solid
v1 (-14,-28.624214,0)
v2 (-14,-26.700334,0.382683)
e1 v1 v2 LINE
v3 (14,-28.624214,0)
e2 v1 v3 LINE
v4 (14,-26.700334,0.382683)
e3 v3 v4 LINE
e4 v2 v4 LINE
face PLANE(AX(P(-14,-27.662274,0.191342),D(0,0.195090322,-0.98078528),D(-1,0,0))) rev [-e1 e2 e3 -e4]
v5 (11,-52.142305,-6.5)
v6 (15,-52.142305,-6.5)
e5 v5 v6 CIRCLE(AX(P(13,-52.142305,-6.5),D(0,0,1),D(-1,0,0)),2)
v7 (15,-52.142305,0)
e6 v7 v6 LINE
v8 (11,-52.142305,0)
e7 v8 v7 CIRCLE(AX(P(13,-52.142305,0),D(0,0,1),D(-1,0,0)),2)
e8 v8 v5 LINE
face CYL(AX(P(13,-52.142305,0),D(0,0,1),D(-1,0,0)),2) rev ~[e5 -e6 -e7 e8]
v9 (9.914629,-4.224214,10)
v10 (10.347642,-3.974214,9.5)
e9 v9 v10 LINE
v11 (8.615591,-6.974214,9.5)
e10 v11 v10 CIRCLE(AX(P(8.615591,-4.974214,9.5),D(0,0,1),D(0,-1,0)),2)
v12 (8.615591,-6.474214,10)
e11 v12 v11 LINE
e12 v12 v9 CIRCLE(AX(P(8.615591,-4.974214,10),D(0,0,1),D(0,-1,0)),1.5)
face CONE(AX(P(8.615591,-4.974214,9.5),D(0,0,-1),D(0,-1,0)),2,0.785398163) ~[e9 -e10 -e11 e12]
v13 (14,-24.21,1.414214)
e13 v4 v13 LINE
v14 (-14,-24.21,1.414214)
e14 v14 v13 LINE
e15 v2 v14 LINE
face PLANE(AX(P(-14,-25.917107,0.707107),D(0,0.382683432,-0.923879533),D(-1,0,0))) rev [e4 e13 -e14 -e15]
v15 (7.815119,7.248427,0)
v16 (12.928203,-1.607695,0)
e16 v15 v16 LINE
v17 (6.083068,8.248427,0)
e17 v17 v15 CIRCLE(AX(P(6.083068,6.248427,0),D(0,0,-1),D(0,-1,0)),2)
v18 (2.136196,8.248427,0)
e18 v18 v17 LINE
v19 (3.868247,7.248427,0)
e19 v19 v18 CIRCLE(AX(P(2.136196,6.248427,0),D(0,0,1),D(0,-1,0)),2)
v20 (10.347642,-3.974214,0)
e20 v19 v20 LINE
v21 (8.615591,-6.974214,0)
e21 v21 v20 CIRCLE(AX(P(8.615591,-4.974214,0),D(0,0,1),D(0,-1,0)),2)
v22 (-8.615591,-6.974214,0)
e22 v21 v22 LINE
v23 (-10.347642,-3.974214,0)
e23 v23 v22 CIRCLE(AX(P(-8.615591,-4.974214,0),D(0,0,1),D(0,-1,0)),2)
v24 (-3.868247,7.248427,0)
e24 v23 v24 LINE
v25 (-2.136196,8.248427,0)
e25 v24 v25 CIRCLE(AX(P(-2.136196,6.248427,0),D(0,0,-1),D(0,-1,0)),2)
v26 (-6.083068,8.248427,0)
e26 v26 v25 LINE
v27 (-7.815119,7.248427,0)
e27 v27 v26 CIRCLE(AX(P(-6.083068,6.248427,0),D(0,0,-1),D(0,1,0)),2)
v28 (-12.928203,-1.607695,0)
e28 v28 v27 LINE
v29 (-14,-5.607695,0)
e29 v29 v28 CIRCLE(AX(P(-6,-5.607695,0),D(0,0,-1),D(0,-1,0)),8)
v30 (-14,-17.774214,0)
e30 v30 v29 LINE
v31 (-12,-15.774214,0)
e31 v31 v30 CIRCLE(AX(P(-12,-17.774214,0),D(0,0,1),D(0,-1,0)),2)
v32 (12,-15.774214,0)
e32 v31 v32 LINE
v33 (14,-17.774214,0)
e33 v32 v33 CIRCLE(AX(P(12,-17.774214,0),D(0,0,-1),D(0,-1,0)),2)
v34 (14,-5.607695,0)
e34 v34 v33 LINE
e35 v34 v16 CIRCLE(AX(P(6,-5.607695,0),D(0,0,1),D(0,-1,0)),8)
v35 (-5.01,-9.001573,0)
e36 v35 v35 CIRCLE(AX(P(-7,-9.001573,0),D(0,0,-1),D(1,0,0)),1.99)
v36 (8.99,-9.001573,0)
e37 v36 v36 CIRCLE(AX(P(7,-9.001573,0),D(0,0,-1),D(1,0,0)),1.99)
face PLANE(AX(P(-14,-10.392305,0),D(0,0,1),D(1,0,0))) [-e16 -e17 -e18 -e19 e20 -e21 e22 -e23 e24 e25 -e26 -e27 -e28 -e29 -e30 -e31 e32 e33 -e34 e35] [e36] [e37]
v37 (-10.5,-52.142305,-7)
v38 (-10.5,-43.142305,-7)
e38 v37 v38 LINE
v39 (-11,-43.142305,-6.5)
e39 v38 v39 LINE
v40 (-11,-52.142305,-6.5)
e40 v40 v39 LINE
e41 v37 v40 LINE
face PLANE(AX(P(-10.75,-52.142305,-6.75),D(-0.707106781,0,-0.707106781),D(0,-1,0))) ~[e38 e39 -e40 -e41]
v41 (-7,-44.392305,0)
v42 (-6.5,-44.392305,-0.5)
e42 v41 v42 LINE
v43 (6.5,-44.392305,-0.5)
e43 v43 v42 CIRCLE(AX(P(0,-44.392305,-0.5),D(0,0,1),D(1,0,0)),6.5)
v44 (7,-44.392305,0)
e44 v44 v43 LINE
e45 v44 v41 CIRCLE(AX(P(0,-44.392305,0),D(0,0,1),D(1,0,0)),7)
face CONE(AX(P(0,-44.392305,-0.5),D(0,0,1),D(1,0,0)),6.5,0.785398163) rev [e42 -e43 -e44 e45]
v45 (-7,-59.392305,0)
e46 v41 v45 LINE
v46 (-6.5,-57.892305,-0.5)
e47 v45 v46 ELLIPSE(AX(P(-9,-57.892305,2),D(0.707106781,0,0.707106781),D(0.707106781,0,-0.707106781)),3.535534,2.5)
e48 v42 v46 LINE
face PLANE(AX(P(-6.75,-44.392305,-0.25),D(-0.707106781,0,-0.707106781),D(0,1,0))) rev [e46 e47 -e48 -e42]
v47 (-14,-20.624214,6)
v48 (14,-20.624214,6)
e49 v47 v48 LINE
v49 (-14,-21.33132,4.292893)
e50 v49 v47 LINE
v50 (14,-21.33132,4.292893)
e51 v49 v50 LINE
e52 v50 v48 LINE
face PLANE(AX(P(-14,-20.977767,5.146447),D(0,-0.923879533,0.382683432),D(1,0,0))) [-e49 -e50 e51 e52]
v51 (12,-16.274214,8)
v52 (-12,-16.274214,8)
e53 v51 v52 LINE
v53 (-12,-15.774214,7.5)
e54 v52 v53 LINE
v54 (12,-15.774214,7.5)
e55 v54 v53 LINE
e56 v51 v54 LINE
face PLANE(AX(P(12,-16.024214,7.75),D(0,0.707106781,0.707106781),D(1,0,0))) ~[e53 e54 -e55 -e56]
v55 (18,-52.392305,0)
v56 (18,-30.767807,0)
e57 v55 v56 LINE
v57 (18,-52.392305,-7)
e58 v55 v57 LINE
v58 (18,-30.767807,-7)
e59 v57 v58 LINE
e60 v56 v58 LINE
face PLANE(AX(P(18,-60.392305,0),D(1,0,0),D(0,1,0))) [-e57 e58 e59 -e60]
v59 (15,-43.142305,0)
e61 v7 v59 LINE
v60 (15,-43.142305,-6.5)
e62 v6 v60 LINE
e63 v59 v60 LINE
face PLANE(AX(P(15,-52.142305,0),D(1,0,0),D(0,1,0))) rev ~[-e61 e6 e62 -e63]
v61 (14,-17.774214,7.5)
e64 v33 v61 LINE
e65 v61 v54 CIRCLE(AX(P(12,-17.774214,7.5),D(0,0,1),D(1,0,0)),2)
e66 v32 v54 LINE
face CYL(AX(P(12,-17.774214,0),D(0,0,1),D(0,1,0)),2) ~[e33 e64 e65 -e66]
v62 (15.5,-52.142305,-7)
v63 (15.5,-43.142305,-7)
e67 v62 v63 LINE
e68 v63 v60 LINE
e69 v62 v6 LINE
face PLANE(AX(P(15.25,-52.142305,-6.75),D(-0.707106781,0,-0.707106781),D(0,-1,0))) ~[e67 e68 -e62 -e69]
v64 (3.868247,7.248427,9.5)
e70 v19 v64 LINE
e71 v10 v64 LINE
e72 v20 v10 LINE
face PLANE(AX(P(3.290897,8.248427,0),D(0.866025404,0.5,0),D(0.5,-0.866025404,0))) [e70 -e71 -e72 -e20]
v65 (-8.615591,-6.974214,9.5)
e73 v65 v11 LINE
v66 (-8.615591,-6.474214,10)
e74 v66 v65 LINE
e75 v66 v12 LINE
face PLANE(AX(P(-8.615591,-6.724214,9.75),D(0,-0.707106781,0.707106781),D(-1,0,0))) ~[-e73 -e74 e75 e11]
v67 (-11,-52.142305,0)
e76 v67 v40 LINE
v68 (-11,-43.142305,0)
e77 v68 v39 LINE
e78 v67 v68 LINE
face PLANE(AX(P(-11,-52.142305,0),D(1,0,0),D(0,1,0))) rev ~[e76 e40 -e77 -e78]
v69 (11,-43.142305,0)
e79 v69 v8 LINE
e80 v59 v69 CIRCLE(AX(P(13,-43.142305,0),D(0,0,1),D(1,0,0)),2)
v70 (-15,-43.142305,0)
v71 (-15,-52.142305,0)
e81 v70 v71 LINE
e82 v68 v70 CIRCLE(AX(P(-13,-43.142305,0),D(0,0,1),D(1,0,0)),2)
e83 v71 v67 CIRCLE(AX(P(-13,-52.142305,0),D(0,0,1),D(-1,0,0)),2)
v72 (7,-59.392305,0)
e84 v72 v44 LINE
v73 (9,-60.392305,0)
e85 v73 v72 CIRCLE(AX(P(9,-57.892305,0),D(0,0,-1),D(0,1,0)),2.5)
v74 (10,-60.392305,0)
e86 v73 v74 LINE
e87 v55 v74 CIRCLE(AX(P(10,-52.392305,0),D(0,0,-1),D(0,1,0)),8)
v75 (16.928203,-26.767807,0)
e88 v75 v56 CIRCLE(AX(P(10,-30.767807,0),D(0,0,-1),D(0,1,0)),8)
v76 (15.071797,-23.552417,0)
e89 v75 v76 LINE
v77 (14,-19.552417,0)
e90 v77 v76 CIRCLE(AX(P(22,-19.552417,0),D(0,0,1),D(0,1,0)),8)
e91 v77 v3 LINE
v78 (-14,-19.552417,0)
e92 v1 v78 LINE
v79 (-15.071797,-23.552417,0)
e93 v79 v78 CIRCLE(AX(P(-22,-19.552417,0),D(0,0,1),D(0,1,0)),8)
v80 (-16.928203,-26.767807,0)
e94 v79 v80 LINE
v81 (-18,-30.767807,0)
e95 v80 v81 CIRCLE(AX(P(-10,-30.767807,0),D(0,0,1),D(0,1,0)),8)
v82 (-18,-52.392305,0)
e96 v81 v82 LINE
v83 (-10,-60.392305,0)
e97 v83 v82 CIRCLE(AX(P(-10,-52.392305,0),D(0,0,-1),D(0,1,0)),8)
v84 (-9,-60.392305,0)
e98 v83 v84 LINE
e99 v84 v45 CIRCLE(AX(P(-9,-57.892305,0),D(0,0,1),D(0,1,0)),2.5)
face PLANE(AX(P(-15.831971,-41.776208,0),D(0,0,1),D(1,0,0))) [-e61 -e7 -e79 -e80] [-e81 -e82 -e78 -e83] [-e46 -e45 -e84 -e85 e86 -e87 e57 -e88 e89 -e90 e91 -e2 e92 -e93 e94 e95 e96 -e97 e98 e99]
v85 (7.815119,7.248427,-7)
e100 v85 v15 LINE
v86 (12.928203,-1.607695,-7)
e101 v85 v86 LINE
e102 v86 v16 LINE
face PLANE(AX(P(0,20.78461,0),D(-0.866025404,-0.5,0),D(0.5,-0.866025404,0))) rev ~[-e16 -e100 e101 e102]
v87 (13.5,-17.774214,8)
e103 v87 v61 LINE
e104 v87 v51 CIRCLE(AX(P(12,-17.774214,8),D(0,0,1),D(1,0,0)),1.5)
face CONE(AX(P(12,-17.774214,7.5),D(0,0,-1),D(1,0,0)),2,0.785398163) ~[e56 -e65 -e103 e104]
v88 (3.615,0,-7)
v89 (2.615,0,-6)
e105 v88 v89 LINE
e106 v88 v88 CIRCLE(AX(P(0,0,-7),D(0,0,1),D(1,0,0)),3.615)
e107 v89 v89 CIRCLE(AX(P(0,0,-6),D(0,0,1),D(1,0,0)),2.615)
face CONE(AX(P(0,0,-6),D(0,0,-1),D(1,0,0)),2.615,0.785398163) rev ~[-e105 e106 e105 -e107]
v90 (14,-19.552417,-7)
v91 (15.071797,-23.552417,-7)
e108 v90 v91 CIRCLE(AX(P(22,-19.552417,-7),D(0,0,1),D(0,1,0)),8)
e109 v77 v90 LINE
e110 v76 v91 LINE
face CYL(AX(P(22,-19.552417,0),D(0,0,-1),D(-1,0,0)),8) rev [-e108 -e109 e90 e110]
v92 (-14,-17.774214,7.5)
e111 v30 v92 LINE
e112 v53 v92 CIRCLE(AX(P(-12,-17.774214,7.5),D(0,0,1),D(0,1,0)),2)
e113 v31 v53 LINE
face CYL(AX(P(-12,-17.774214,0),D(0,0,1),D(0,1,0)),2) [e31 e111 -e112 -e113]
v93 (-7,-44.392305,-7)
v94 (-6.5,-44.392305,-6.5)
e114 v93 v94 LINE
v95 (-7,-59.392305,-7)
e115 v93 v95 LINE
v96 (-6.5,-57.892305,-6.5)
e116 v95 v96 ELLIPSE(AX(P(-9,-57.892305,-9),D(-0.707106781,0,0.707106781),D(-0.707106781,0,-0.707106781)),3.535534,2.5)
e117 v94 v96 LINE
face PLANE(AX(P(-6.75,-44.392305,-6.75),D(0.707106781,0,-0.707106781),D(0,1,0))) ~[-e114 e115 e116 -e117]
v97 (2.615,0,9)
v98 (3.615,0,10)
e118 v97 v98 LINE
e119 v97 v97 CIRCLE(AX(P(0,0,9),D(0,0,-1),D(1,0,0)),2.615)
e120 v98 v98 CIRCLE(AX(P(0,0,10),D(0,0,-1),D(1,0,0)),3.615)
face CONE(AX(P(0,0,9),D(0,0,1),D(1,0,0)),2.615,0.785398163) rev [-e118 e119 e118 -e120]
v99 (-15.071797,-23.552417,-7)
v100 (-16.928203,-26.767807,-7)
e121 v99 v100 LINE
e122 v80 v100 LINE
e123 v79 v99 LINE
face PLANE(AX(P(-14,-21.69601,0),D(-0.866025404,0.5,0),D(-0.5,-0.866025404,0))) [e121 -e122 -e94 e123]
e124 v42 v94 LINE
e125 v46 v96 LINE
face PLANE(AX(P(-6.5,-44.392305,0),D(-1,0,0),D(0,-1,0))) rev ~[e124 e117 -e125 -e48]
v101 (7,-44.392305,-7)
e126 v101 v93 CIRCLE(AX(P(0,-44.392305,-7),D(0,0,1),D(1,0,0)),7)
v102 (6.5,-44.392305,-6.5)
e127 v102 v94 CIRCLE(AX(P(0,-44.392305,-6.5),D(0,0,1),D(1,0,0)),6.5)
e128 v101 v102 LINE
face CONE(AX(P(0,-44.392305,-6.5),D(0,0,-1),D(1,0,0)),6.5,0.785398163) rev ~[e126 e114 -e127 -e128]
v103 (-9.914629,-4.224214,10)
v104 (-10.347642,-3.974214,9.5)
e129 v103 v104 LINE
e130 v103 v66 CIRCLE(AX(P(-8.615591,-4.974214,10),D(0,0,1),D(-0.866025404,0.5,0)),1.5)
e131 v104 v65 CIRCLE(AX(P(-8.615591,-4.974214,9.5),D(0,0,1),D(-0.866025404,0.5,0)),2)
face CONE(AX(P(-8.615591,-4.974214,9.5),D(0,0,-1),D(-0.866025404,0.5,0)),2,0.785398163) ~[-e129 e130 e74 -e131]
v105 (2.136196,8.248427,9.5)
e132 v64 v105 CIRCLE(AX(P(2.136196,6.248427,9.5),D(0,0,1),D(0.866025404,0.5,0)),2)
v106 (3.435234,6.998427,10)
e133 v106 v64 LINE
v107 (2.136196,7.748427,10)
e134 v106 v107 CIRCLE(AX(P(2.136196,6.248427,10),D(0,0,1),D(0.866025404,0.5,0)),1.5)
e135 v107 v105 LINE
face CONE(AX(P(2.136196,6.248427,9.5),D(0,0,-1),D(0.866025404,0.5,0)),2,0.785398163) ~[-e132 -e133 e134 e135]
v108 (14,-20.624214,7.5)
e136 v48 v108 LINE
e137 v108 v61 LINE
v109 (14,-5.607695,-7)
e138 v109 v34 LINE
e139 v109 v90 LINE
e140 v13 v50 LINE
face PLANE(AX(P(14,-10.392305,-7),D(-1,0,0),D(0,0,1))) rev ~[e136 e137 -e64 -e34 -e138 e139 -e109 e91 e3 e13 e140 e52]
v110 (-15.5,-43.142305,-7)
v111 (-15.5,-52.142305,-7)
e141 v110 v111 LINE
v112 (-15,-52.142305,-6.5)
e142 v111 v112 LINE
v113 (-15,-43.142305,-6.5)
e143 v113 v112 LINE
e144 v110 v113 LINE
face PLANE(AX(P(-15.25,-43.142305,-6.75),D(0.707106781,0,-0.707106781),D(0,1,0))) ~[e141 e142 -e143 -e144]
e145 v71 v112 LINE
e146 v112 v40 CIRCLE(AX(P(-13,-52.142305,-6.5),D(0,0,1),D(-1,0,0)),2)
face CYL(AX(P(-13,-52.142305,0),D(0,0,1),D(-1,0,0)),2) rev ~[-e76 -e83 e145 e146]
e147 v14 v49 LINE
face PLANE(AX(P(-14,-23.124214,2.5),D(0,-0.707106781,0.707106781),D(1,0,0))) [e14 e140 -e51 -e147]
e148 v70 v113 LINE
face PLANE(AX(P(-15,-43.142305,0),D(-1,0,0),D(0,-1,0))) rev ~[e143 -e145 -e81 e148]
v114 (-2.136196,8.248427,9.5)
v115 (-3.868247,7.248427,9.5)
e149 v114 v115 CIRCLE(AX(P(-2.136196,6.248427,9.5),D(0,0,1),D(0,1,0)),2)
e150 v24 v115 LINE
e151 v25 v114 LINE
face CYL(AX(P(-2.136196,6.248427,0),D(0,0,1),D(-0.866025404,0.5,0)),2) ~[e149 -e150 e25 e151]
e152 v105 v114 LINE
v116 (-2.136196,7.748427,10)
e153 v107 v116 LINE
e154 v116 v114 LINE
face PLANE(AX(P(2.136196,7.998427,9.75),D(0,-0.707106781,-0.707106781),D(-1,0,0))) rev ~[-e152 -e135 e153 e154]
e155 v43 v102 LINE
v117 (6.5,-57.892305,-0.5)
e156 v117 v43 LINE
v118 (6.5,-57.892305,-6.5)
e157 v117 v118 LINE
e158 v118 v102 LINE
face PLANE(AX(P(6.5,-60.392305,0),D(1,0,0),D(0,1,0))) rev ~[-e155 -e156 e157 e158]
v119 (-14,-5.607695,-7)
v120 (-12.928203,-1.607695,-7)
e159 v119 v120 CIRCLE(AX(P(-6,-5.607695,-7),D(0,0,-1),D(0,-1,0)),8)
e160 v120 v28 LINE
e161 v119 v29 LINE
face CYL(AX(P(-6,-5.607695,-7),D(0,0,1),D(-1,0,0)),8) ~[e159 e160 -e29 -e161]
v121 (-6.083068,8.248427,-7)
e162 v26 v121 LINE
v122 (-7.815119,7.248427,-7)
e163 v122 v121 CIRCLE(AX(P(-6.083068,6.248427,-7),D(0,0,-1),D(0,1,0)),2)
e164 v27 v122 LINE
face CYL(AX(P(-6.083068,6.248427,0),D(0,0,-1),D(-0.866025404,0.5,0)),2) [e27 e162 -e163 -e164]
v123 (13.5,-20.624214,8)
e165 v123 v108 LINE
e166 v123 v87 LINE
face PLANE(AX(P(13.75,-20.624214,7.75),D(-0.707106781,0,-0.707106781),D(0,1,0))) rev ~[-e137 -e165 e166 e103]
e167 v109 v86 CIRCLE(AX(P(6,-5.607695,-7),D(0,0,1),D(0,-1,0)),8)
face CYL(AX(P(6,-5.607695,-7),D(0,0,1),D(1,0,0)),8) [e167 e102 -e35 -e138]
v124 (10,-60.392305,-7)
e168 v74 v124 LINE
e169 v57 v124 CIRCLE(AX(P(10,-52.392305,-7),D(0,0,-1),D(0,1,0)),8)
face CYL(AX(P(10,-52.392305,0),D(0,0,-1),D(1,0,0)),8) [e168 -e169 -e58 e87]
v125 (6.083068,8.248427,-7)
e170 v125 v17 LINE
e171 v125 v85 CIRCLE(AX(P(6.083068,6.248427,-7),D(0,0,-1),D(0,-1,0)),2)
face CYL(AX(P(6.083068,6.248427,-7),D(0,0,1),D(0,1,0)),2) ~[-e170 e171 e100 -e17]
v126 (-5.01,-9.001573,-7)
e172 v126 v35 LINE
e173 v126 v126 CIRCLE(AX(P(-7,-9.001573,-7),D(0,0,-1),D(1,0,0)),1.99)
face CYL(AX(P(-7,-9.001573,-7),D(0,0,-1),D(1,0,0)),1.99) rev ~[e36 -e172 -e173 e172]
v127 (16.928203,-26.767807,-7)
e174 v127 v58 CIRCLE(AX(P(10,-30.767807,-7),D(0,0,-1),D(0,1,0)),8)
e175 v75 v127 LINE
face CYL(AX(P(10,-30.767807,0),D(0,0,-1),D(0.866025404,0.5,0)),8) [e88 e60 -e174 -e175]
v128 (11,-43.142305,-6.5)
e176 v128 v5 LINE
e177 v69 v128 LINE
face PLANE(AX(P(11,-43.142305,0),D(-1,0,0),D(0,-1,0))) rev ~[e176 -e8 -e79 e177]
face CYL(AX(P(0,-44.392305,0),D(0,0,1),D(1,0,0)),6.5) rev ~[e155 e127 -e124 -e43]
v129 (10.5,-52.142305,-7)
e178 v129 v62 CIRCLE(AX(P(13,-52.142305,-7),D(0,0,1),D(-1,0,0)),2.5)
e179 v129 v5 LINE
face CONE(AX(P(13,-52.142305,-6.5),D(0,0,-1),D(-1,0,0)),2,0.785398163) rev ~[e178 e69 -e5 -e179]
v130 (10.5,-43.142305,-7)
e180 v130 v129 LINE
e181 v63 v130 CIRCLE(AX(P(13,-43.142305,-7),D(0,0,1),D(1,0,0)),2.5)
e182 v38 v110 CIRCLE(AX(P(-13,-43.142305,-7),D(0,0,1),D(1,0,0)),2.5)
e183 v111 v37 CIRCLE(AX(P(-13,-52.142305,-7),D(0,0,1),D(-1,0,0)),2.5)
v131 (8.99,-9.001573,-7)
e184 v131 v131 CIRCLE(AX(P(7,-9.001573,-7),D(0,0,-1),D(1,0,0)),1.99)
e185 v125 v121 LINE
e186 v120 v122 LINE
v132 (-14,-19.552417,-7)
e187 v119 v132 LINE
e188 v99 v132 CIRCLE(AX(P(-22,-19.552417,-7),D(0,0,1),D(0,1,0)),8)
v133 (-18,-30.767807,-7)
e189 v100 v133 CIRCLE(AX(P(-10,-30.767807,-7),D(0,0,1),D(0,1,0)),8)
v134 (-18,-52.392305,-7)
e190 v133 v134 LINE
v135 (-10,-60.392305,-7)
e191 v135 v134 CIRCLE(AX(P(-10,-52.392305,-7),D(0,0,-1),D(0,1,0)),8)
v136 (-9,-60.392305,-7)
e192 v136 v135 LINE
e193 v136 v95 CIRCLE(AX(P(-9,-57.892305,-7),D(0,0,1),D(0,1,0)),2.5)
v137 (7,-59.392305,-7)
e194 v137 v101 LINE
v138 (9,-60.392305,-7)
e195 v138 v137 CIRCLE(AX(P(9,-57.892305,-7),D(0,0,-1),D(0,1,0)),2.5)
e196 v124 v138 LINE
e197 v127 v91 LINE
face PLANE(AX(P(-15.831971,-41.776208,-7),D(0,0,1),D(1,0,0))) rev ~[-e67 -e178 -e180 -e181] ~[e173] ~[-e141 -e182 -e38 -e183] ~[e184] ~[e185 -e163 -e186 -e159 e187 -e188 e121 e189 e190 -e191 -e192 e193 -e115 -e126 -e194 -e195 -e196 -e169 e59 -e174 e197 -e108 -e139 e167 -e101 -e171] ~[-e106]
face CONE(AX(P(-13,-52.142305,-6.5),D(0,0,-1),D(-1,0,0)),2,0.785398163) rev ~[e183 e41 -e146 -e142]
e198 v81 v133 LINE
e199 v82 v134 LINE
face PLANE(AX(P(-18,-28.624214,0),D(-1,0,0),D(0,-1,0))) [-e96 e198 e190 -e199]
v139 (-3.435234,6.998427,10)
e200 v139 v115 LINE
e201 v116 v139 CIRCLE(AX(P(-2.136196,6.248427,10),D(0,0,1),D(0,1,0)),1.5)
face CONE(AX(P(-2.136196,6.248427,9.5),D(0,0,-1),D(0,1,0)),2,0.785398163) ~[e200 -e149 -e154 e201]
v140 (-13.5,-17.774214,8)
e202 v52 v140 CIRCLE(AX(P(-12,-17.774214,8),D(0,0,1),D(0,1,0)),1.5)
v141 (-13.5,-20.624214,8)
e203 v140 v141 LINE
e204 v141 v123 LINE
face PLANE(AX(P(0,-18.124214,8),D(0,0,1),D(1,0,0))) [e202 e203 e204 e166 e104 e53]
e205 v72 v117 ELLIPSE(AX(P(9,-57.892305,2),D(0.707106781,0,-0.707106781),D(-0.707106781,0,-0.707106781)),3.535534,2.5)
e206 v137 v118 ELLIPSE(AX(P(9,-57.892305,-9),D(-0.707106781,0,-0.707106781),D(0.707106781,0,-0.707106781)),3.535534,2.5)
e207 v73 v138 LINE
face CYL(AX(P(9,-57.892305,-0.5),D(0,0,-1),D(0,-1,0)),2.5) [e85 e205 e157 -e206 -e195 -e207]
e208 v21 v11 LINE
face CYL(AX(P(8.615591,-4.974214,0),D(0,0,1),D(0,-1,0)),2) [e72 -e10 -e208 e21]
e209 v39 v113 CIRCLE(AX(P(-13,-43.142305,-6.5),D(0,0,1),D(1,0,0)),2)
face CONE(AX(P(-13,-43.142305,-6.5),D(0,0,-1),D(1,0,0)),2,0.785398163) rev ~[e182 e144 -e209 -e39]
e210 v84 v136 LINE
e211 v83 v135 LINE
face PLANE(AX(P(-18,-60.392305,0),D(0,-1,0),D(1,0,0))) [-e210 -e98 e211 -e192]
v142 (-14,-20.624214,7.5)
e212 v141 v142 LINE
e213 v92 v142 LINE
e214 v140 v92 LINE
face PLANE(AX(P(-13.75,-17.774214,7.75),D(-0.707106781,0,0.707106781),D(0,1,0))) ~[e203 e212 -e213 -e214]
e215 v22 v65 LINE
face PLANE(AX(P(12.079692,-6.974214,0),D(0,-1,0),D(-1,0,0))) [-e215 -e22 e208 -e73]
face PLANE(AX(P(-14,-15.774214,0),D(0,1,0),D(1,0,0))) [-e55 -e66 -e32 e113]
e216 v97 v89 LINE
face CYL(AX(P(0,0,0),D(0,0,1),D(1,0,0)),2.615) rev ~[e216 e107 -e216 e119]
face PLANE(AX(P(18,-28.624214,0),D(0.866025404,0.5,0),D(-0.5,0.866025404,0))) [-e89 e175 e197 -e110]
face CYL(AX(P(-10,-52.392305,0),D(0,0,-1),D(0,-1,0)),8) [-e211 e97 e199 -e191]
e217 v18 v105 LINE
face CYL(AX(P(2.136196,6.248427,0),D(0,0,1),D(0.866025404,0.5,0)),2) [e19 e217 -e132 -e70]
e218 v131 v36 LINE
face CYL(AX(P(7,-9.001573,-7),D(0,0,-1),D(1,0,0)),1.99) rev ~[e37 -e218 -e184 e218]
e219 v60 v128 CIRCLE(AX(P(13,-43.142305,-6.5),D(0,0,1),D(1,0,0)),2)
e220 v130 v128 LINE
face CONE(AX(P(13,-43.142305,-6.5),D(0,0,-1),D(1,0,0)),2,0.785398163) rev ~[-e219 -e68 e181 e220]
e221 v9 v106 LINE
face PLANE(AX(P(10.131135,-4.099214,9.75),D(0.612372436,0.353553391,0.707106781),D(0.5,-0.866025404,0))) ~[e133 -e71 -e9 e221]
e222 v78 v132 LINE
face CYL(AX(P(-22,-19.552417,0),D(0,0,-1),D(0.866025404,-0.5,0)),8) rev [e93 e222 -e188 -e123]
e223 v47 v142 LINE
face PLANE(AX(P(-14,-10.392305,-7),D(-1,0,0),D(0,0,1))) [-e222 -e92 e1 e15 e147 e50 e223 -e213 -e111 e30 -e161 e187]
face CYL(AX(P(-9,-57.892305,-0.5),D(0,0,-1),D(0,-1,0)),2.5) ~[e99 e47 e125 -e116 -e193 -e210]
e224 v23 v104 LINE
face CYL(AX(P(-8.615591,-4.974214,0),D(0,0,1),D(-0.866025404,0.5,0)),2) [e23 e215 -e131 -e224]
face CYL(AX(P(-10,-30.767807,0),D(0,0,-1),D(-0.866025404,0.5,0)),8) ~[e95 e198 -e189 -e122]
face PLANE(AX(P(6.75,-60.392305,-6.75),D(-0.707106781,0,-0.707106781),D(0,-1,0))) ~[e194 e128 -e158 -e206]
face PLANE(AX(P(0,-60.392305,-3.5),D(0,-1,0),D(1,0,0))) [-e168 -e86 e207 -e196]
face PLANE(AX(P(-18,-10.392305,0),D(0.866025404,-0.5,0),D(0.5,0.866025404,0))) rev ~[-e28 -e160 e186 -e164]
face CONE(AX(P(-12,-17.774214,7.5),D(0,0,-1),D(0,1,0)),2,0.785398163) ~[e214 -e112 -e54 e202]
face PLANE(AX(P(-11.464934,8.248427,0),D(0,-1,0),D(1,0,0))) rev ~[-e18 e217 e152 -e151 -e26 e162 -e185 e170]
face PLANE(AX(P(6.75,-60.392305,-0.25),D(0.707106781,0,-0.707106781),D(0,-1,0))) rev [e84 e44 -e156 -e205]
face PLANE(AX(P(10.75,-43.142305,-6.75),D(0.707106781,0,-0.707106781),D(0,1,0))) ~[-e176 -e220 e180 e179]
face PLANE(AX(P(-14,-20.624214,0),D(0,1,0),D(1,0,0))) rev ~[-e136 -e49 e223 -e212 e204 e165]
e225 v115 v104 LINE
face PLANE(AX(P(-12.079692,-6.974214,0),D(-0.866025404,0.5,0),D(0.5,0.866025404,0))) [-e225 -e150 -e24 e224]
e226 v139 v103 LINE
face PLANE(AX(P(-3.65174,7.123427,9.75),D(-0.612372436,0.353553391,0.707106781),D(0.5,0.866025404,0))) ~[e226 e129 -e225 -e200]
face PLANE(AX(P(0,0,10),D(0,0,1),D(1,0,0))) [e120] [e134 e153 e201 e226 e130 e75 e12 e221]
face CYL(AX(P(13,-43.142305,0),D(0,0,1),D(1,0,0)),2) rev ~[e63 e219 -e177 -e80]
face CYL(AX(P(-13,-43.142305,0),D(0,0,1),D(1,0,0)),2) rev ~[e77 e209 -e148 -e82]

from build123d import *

# Parameters (mm, degrees)
F1_DEPTH      = 10
F3_DEPTH      = 7
F4_R          = 2.615
F4_W          = 5
F4_H          = 10
F5_DEPTH      = 10.001
F5_DEPTH_BACK = 25
F6_W          = 28
F6_H          = 7
F7_DEPTH      = 50
F8_W          = 28
F8_H          = 5
F9_DEPTH      = 8
F10_SIZE      = 5
F11_SIZE      = 2
F12_SIZE      = 1
F13_SIZE      = 1
F14_R         = 8
F15_SIZE      = 1
F17_DEPTH     = 10.001
F18_R         = 2
F20_DEPTH     = 7.001
F22_DEPTH     = 7
F23_R         = 8
F25_DEPTH     = 7.001
F26_SIZE      = 0.5
F27_R         = 1.99
F28_DEPTH     = 17.001
F29_R         = 2.5


# Not quite as in the source:
# - a feature names something its author has since deleted; it is built from what else it names


with BuildPart() as f1:
    # F0 (on Top) → F1 (new body)
    with BuildSketch(Plane.XY):
        Polygon((0, 14.2484272933), (-12.3395, -7.1242136467), (12.3395, -7.1242136467), align=None)
    extrude(amount=F1_DEPTH)

    # F2 (on face) → F3 (join)
    with BuildSketch(Plane(origin=(0, 0, 0), x_dir=(1, 0, 0), z_dir=(0, 0, -1))):
        Polygon((-18, 10.3923048454), (0, -20.7846096908), (18, 10.3923048454), align=None)
    extrude(amount=F3_DEPTH)

    # F4 (on Top) → F5 (cut, two sides)
    with BuildSketch(Plane.XY) as f5_sk:
        Polygon((-11.5514649078, 20.9689907423), (-11.4649338648, 8.2484272933), (13.3285973679, 8.2484272933), (13.3285973679, 20.9689907423), align=None)
        Circle(F4_R)
        with Locations((-16.5, -8)):
            Rectangle(F4_W, F4_H)
        with Locations((16.5, -8)):
            Rectangle(F4_W, F4_H)
    extrude(amount=F5_DEPTH, mode=Mode.SUBTRACT)
    extrude(f5_sk.sketch, amount=-F5_DEPTH_BACK, mode=Mode.SUBTRACT)

    # F6 (on face) → F7 (join)
    with BuildSketch(Plane.XZ.offset(10.3923048454)):
        with Locations((0, -3.5)):
            Rectangle(F6_W, F6_H)
    extrude(amount=F7_DEPTH)

    # F8 (on face) → F9 (join)
    with BuildSketch(Plane.XY):
        with Locations((0, -18.1242136467)):
            Rectangle(F8_W, F8_H)
    extrude(amount=F9_DEPTH)

    # F10
    f10_edges = [f1.edges().sort_by_distance(p)[0] for p in [
        (0, -20.624214, 0),
    ]]
    chamfer(f10_edges, length=F10_SIZE)

    # F11
    f11_edges = [f1.edges().sort_by_distance(p)[0] for p in [
        (0, -25.624214, 0),
    ]]
    chamfer(f11_edges, length=F11_SIZE)

    # F12
    f12_edges = [f1.edges().sort_by_distance(p)[0] for p in [
        (0, -27.624214, 0),
    ]]
    chamfer(f12_edges, length=F12_SIZE)

    # F13
    f13_edges = [f1.edges().sort_by_distance(p)[0] for p in [
        (0, -20.624214, 5),
    ]]
    chamfer(f13_edges, length=F13_SIZE)

    # F14
    f14_edges = [f1.edges().sort_by_distance(p)[0] for p in [
        (-14, -3.464102, -3.5),
        (14, -3.464102, -3.5),
    ]]
    fillet(f14_edges, radius=F14_R)

    # F15
    f15_edges = [f1.edges().sort_by_distance(p)[0] for p in [
        (-2.615, 0, 10),
        (-2.615, 0, -7),
    ]]
    chamfer(f15_edges, length=F15_SIZE)

    # F16 (on face) → F17 (cut, through all)
    with BuildSketch(Plane.XY):
        Polygon((12.0796923789, -6.9742136467), (-12.0796923789, -6.9742136467), (-3.2908965344, 8.2484272933), (-14, 8.2484272933), (-14, -15.7742136467), (14, -15.7742136467), (14, 8.2484272933), (7.2377682818, 8.2484272933), (3.2908965344, 8.2484272933), align=None)
    extrude(amount=F17_DEPTH, mode=Mode.SUBTRACT)

    # F18
    f18_edges = [f1.edges().sort_by_distance(p)[0] for p in [
        (-12.079692, -6.974214, 5),
        (12.079692, -6.974214, 5),
        (3.290897, 8.248427, 5),
        (-3.290897, 8.248427, 5),
        (-7.237768, 8.248427, -3.5),
        (7.237768, 8.248427, -3.5),
        (-14, -15.774214, 4),
        (14, -15.774214, 4),
    ]]
    fillet(f18_edges, radius=F18_R)

    # F19 (on face) → F20 (cut, through all)
    with BuildSketch(Plane.XY):
        with BuildLine():
            Line((6.5, -50.8923048454), (6.5, -44.3923048454))
            ThreePointArc((6.5, -44.3923048454), (0, -37.8923048454), (-6.5, -44.3923048454))
            Line((-6.5, -44.3923048454), (-6.5, -50.8923048454))
            Line((-6.5, -50.8923048454), (-6.5, -60.3923048454))
            Line((-6.5, -60.3923048454), (6.5, -60.3923048454))
            Line((6.5, -60.3923048454), (6.5, -50.8923048454))
        make_face()
    extrude(amount=-F20_DEPTH, mode=Mode.SUBTRACT)

    # F21 (on face) → F22 (join, through all)
    with BuildSketch(Plane.XY):
        Polygon((-14, -60.3923048454), (-14, -28.6242136467), (-14, -21.6960104164), (-18, -28.6242136467), (-18, -60.3923048454), align=None)
        Polygon((14, -28.6242136467), (14, -60.3923048454), (18, -60.3923048454), (18, -28.6242136467), (14, -21.6960104164), align=None)
    extrude(amount=-F22_DEPTH)

    # F23
    f23_edges = [f1.edges().sort_by_distance(p)[0] for p in [
        (18, -28.624214, -3.5),
        (14, -21.69601, -3.5),
        (-14, -21.69601, -3.5),
        (-18, -28.624214, -3.5),
        (-18, -60.392305, -3.5),
        (18, -60.392305, -3.5),
    ]]
    fillet(f23_edges, radius=F23_R)

    # F24 (on face) → F25 (cut, through all)
    with BuildSketch(Plane.XY):
        with BuildLine():
            Line((-11, -52.1423048454), (-11, -43.1423048454))
            ThreePointArc((-11, -43.1423048454), (-13, -41.1423048454), (-15, -43.1423048454))
            Line((-15, -43.1423048454), (-15, -52.1423048454))
            ThreePointArc((-15, -52.1423048454), (-13, -54.1423048454), (-11, -52.1423048454))
        make_face()
        with BuildLine():
            Line((15, -52.1423048454), (15, -43.1423048454))
            ThreePointArc((15, -43.1423048454), (13, -41.1423048454), (11, -43.1423048454))
            Line((11, -43.1423048454), (11, -52.1423048454))
            ThreePointArc((11, -52.1423048454), (13, -54.1423048454), (15, -52.1423048454))
        make_face()
    extrude(amount=-F25_DEPTH, mode=Mode.SUBTRACT)

    # F26
    f26_edges = [f1.edges().sort_by_distance(p)[0] for p in [
        (6.5, -52.392305, -7),
        (6.5, -52.392305, 0),
        (0, -6.974214, 10),
        (0, -15.774214, 8),
        (0, -37.892305, -7),
        (-6.5, -52.392305, -7),
        (-11, -47.642305, -7),
        (-13, -54.142305, -7),
        (-15, -47.642305, -7),
        (-13, -41.142305, -7),
        (15, -47.642305, -7),
        (13, -54.142305, -7),
        (11, -47.642305, -7),
        (13, -41.142305, -7),
        (-6.5, -52.392305, 0),
        (0, -37.892305, 0),
        (14, -19.199214, 8),
        (13.414214, -16.36, 8),
        (-14, -19.199214, 8),
        (-13.414214, -16.36, 8),
        (3.136196, 7.980478, 10),
        (7.107944, 1.637107, 10),
        (10.347642, -5.974214, 10),
        (0, 8.248427, 10),
        (-10.347642, -5.974214, 10),
        (-3.136196, 7.980478, 10),
        (-7.107944, 1.637107, 10),
    ]]
    chamfer(f26_edges, length=F26_SIZE)

    # F27 (on face) → F28 (cut, through all)
    with BuildSketch(Plane(origin=(0, 0, -7), x_dir=(1, 0, 0), z_dir=(0, 0, -1))):
        with Locations((-7, 9.0015727067)):
            Circle(F27_R)
        with Locations((7, 9.0015727067)):
            Circle(F27_R)
    extrude(amount=-F28_DEPTH, mode=Mode.SUBTRACT)

    # F29
    f29_edges = [f1.edges().sort_by_distance(p)[0] for p in [
        (-6.5, -60.392305, -3.5),
        (6.5, -60.392305, -3.5),
    ]]
    fillet(f29_edges, radius=F29_R)


solid = f1.part
